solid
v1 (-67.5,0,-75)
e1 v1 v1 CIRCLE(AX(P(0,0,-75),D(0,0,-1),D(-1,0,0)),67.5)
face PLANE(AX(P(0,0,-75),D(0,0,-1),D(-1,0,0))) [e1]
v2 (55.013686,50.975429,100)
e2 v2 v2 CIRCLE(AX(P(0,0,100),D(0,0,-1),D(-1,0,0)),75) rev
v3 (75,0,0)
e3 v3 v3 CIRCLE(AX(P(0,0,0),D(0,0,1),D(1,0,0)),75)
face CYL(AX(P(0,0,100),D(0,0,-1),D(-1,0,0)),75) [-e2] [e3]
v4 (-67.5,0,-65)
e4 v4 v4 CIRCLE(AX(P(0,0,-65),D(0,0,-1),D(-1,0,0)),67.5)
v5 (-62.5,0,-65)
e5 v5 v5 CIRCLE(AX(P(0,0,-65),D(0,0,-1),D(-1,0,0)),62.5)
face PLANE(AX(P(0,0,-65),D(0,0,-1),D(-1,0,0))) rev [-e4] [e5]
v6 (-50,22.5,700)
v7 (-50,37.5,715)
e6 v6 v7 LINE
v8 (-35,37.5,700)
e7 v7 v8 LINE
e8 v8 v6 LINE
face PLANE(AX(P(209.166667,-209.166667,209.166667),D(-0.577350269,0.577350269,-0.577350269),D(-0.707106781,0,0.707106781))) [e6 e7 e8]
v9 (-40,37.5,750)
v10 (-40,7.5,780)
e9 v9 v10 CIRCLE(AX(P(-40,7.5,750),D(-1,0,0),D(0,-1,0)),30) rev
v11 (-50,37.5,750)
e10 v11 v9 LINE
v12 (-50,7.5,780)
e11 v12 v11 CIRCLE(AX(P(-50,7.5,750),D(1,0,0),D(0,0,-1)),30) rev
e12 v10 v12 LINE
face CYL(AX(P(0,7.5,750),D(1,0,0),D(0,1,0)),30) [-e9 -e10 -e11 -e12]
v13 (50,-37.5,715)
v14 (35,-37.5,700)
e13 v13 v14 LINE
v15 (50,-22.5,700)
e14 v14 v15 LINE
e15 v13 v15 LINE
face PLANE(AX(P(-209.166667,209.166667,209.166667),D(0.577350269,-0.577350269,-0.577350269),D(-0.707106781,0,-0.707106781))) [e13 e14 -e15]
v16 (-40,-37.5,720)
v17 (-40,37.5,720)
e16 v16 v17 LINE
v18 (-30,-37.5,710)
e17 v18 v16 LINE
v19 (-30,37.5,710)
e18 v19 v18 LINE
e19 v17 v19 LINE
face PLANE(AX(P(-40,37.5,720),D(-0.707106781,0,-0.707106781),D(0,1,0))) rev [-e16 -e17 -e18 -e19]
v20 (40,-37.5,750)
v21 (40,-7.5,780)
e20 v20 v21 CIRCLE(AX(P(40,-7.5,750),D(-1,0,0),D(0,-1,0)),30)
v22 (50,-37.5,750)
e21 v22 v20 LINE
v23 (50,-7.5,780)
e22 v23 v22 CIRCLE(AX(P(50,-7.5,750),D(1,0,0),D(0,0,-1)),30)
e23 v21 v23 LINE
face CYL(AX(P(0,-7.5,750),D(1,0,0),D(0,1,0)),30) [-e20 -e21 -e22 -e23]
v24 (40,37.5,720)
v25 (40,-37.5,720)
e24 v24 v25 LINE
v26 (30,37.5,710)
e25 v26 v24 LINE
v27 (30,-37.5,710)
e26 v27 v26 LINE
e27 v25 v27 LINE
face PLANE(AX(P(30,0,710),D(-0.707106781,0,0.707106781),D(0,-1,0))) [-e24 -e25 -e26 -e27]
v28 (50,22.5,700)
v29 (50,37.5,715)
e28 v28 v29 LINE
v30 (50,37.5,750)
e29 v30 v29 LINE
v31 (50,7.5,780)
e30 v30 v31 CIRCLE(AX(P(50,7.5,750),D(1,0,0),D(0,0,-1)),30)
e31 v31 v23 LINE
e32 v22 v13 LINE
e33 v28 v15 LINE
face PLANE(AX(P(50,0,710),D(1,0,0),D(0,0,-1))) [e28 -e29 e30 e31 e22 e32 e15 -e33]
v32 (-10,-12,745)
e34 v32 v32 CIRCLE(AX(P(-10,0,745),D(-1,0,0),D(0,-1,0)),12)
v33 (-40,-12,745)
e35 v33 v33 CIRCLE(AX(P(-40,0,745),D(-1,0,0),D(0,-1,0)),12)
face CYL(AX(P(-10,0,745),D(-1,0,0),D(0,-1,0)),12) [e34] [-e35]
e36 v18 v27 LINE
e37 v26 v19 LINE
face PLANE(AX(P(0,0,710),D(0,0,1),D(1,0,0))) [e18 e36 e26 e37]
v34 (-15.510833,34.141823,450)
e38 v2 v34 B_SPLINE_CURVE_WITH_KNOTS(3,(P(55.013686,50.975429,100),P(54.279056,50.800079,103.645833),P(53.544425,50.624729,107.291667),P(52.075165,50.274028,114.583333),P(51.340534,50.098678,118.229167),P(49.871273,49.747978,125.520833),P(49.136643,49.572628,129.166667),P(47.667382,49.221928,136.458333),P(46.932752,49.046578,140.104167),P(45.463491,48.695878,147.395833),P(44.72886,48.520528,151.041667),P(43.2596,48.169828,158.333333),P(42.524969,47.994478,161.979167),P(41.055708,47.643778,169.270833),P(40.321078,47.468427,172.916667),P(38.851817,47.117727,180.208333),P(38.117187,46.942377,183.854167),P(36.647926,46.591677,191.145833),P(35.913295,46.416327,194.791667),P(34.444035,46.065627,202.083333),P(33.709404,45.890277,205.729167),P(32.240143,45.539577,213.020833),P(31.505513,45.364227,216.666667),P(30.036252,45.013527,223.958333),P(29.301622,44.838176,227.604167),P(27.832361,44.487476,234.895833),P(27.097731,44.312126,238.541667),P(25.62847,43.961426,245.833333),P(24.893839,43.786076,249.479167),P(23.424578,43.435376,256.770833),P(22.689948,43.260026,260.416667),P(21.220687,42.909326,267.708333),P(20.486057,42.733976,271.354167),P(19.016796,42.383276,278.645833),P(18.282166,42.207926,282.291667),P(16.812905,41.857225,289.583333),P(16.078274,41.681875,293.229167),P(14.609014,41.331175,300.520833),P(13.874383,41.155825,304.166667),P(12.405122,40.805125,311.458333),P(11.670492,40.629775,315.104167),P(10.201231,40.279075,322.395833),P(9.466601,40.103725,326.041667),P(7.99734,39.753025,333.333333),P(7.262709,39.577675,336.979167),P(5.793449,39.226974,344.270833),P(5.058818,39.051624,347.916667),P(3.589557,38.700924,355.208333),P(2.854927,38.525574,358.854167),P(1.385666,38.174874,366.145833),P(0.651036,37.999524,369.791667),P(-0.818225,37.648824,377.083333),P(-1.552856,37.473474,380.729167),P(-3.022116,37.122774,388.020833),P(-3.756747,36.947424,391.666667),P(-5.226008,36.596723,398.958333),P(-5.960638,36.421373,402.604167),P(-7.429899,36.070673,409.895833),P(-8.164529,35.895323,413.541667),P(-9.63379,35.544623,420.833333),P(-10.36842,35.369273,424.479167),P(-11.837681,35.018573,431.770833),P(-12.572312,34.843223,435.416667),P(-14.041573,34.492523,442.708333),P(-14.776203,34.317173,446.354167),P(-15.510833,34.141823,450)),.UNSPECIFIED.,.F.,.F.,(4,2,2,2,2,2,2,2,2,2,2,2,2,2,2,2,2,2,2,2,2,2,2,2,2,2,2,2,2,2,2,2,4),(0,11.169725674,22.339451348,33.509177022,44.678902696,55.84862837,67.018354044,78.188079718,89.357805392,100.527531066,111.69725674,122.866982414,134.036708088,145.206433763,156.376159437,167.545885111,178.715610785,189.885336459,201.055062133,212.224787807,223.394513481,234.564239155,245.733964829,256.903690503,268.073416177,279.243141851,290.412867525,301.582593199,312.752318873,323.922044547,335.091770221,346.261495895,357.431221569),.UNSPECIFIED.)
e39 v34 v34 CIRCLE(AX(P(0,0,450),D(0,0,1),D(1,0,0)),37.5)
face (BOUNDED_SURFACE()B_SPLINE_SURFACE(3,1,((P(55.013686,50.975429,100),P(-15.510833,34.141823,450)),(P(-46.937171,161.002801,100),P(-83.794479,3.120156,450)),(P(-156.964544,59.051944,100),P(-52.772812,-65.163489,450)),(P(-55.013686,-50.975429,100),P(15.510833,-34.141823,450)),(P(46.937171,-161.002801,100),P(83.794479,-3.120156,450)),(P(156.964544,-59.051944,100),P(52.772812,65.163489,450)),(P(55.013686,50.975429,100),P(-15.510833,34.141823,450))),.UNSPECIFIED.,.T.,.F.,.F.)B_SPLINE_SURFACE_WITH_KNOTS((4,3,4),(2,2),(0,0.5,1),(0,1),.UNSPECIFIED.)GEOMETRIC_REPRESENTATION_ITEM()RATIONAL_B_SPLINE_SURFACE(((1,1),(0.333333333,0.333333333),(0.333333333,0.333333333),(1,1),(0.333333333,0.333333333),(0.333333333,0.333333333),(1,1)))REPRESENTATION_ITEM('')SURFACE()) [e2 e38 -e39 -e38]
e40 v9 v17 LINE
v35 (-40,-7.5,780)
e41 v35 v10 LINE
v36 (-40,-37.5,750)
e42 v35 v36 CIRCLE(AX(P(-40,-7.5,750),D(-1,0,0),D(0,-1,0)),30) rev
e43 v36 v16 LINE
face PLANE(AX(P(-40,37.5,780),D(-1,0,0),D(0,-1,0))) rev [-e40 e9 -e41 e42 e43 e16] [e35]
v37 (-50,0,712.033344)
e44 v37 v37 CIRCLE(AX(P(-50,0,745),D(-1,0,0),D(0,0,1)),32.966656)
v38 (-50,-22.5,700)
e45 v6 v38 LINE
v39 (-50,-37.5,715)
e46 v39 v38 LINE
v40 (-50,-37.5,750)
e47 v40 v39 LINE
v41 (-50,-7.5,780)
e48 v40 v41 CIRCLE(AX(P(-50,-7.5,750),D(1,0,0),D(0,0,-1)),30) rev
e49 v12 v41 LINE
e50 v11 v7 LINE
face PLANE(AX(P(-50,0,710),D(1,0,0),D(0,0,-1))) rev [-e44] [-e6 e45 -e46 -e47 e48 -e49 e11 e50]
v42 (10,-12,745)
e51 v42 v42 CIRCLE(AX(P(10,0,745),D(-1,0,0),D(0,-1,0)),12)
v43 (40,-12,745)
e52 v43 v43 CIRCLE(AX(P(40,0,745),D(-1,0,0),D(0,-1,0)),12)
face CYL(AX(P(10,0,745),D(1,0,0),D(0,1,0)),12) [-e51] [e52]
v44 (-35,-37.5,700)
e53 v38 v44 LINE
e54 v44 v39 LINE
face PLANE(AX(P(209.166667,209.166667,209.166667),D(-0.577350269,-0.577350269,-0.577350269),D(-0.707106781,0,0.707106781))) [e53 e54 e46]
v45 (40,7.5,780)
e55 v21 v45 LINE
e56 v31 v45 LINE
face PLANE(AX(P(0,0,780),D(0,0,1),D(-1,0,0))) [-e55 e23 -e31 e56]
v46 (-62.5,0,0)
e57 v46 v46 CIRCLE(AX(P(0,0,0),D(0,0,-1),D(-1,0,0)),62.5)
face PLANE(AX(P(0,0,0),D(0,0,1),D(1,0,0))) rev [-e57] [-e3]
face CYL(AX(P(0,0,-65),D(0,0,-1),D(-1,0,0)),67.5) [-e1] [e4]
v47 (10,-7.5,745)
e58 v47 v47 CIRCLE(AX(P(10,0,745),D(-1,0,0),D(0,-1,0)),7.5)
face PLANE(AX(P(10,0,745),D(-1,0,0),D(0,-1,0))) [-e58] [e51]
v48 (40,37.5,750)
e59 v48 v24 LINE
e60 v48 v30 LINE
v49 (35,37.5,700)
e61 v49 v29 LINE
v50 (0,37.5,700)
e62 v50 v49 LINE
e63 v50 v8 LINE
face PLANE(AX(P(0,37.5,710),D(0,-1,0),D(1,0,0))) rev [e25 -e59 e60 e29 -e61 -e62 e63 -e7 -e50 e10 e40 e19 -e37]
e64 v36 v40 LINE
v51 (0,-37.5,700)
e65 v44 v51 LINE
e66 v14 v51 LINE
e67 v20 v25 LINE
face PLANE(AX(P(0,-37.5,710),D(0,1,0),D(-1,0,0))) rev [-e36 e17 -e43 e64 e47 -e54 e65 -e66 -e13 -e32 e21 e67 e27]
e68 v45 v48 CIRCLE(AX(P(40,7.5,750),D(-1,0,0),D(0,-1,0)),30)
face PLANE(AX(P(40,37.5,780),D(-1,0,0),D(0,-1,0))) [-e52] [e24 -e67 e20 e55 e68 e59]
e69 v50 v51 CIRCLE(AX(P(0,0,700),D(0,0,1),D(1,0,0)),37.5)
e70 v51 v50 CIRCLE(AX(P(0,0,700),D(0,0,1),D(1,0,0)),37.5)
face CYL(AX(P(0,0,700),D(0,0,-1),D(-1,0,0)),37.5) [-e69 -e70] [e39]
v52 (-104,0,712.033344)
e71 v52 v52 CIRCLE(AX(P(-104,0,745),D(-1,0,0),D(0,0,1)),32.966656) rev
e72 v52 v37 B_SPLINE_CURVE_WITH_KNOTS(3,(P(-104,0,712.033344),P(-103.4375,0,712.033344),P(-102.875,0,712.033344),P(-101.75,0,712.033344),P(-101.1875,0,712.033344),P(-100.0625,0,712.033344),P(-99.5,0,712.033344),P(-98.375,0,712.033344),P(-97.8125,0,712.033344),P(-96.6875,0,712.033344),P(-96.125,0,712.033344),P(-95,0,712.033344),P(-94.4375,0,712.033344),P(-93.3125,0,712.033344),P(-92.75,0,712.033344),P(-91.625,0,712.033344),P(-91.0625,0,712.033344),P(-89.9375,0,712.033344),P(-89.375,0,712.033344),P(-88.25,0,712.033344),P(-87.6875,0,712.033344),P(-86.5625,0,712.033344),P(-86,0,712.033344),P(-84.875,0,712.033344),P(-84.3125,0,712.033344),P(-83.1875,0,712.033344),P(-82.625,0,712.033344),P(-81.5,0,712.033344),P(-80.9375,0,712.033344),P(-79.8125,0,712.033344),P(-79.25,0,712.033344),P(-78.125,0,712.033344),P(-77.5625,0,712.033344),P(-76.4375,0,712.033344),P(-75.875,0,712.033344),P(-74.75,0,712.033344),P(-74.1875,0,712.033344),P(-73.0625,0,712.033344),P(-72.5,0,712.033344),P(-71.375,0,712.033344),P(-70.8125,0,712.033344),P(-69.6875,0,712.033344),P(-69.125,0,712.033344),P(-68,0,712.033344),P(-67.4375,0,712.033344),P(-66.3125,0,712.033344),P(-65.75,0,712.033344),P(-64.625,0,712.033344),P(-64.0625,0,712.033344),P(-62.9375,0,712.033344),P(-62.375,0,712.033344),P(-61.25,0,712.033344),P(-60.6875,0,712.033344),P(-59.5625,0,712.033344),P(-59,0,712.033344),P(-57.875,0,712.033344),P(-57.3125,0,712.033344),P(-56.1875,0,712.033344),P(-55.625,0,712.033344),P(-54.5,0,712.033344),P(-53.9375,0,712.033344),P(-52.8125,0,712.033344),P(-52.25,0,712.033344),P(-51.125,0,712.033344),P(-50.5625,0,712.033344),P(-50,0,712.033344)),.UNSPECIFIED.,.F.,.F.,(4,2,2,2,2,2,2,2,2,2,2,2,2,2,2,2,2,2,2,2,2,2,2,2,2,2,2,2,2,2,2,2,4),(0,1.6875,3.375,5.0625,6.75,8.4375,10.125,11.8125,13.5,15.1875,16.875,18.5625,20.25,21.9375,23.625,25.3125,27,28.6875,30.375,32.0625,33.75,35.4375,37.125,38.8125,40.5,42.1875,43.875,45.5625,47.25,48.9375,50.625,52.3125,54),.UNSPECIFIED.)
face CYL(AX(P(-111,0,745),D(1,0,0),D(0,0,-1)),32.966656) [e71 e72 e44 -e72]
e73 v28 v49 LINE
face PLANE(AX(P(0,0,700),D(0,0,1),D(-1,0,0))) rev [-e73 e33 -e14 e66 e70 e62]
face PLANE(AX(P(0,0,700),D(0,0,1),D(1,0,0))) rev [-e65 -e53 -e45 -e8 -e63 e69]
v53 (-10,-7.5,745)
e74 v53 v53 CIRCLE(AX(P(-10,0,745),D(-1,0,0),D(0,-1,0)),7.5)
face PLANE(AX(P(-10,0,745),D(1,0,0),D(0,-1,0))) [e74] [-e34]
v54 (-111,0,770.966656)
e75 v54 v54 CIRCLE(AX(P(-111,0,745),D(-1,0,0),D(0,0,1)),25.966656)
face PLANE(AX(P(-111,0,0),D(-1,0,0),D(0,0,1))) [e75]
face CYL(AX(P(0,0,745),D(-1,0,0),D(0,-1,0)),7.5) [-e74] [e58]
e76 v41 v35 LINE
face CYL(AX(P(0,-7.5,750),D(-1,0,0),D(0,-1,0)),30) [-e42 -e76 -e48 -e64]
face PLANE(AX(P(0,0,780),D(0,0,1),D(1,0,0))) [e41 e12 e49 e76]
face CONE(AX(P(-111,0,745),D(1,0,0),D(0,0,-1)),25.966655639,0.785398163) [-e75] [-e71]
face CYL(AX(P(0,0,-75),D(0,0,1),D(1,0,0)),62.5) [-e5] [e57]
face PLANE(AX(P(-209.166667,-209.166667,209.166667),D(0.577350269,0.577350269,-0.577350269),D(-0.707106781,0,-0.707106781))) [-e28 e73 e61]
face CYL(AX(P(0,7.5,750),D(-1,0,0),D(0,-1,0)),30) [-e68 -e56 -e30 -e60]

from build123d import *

# Parameters (mm, degrees)
SKETCH1_R           = 75
BOSS_EXTRUDE1_DEPTH = 100
SKETCH3_R           = 37.5
BOSS_EXTRUDE2_DEPTH = 250
SKETCH4_R           = 62.5
BOSS_EXTRUDE3_DEPTH = 75
SKETCH5_W           = 50
SKETCH5_H           = 75
BOSS_EXTRUDE4_DEPTH = 10
SKETCH6_W           = 10
SKETCH6_H           = 75
BOSS_EXTRUDE5_DEPTH = 70
SKETCH7_R           = 7.5
BOSS_EXTRUDE6_DEPTH = 40
BOSS_EXTRUDE7_START = 61
SKETCH8_R           = 32.966655639
SKETCH8_R_2         = 7.5
BOSS_EXTRUDE7_DEPTH = 61
CHAMFER2_SIZE       = 7
BOSS_EXTRUDE8_START = 30
SKETCH9_R           = 12
SKETCH9_R_2         = 7.5
BOSS_EXTRUDE8_DEPTH = 30
FILLET1_R           = 30
CHAMFER4_SIZE       = 10
CHAMFER5_START      = 353
CHAMFER5_OUTLINE_W  = 21
CHAMFER5_OUTLINE_H  = 25
CHAMFER5_DEPTH      = 9.287293916
CHAMFER6_START      = 353
CHAMFER6_OUTLINE_W  = 21
CHAMFER6_OUTLINE_H  = 25
CHAMFER6_DEPTH      = 9.287293916
CHAMFER7_START      = -362.287293916
CHAMFER7_OUTLINE_W  = 21
CHAMFER7_OUTLINE_H  = 25
CHAMFER7_DEPTH      = 9.287293916
CHAMFER8_START      = -362.287293916
CHAMFER8_OUTLINE_W  = 21
CHAMFER8_OUTLINE_H  = 25
CHAMFER8_DEPTH      = 9.287293916
SKETCH10_R          = 67.5
BOSS_EXTRUDE9_DEPTH = 10


with BuildPart() as part:
    # Sketch1 → Boss-Extrude1 (new body)
    with BuildSketch(Plane.XY):
        Circle(SKETCH1_R)
    extrude(amount=BOSS_EXTRUDE1_DEPTH)

    # Loft1: read off the stored shape, not the designer's step
    # Loft1: loft between two sections, ruled curve by curve
    loft1_from = [
        Edge.make_bspline([(55.013686164, 50.975428734, 100), (-46.937171304, 161.002801063, 100), (-156.964543632, 59.051943595, 100), (-55.013686164, -50.975428734, 100), (46.937171304, -161.002801063, 100), (156.964543632, -59.051943595, 100), (55.013686164, 50.975428734, 100)], [0, 0, 0, 0, 0.5, 0.5, 0.5, 1, 1, 1, 1], 3, [1, 0.333333333, 0.333333333, 1, 0.333333333, 0.333333333, 1]),
    ]
    loft1_to = [
        Edge.make_bspline([(-15.510833372, 34.141822566, 450), (-83.794478503, 3.120155821, 450), (-52.772811759, -65.16348931, 450), (15.510833372, -34.141822566, 450), (83.794478503, -3.120155821, 450), (52.772811759, 65.16348931, 450), (-15.510833372, 34.141822566, 450)], [0, 0, 0, 0, 0.5, 0.5, 0.5, 1, 1, 1, 1], 3, [1, 0.333333333, 0.333333333, 1, 0.333333333, 0.333333333, 1]),
    ]
    loft1 = Solid(Shell([*[Face.make_surface_from_curves(loft1_from[k], loft1_to[k]) for k in range(1)], Face(Wire(loft1_from)), Face(Wire(loft1_to))]))
    add(loft1)

    # Sketch3 → Boss-Extrude2 (add)
    with BuildSketch(Plane.XY.offset(450)):
        with Locations(Location((0, 0, 0), (0, 0, 114.432581244))):
            Circle(SKETCH3_R)
    extrude(amount=BOSS_EXTRUDE2_DEPTH)

    # Sketch4 → Boss-Extrude3 (add)
    with BuildSketch(Plane(origin=(0, 0, 0), x_dir=(-1, 0, 0), z_dir=(0, 0, -1))):
        Circle(SKETCH4_R)
    extrude(amount=BOSS_EXTRUDE3_DEPTH)

    # Sketch5 → Boss-Extrude4 (add)
    with BuildSketch(Plane.XY.offset(700)):
        with Locations((-25, 0)):
            Rectangle(SKETCH5_W, SKETCH5_H)
    boss_extrude4 = extrude(amount=BOSS_EXTRUDE4_DEPTH)

    # Sketch6 → Boss-Extrude5 (add)
    with BuildSketch(Plane.XY.offset(710)):
        with Locations((-45, 0)):
            Rectangle(SKETCH6_W, SKETCH6_H)
    boss_extrude5 = extrude(amount=BOSS_EXTRUDE5_DEPTH)

    # Sketch7 → Boss-Extrude6 (add)
    with BuildSketch(Plane(origin=(-40, 0, 0), x_dir=(0, 0, -1), z_dir=(1, 0, 0))):
        with Locations(Location((-745, 0, 0), (0, 0, 270))):
            Circle(SKETCH7_R)
    boss_extrude6 = extrude(amount=BOSS_EXTRUDE6_DEPTH)

    # Mirror1: Boss-Extrude4, Boss-Extrude5, Boss-Extrude6 across plane
    add(boss_extrude4.mirror(Plane(origin=(0, 0, 710), x_dir=(0, 0, 1), z_dir=(-1, 0, 0))))
    add(boss_extrude5.mirror(Plane(origin=(0, 0, 710), x_dir=(0, 0, 1), z_dir=(-1, 0, 0))))
    add(boss_extrude6.mirror(Plane(origin=(0, 0, 710), x_dir=(0, 0, 1), z_dir=(-1, 0, 0))))

    # Sketch8 → Boss-Extrude7 (add)
    # profile 1 of 2: a face of its own
    with BuildSketch(Plane.ZY.offset(50).offset(BOSS_EXTRUDE7_START)):
        with Locations(Location((745, 0, 0), (0, 0, 180))):
            Circle(SKETCH8_R)
        with Locations(Location((745, 0, 0), (0, 0, 270))):
            Circle(SKETCH8_R_2, mode=Mode.SUBTRACT)
    # profile 2 of 2: a face of its own
    with BuildSketch(Plane.ZY.offset(50).offset(BOSS_EXTRUDE7_START)):
        with Locations(Location((745, 0, 0), (0, 0, 270))):
            Circle(SKETCH8_R_2)
    extrude(amount=-BOSS_EXTRUDE7_DEPTH)

    # Chamfer2
    chamfer2_edges = [part.edges().sort_by_distance(p)[0] for p in [
        (-111, 0, 777.966655639),
    ]]
    chamfer(chamfer2_edges, length=CHAMFER2_SIZE)

    # Sketch9 → Boss-Extrude8 (add)
    with BuildSketch(Plane.ZY.offset(-40).offset(BOSS_EXTRUDE8_START)):
        with Locations(Location((745, 0, 0), (0, 0, 270))):
            Circle(SKETCH9_R)
        with Locations(Location((745, 0, 0), (0, 0, 270))):
            Circle(SKETCH9_R_2, mode=Mode.SUBTRACT)
    boss_extrude8 = extrude(amount=-BOSS_EXTRUDE8_DEPTH)

    # Mirror2: Boss-Extrude8 across plane
    add(boss_extrude8.mirror(Plane(origin=(0, 0, 0), x_dir=(0, 0, 1), z_dir=(1, 0, 0))))

    # Fillet1
    fillet1_edges = [part.edges().sort_by_distance(p)[0] for p in [
        (-45, -37.5, 780),
        (-45, 37.5, 780),
        (45, 37.5, 780),
        (45, -37.5, 780),
    ]]
    fillet(fillet1_edges, radius=FILLET1_R)

    # Chamfer4
    chamfer4_edges = [part.edges().sort_by_distance(p)[0] for p in [
        (-40, 0, 710),
        (40, 0, 710),
    ]]
    chamfer(chamfer4_edges, length=CHAMFER4_SIZE)

    # Chamfer5: read off the stored shape, not the designer's step
    # Chamfer5 outline → Chamfer5 (cut)
    with BuildSketch(Plane(origin=(0, 0, 0), x_dir=(0.8164965809277258, 0.40824829046386313, -0.40824829046386313), z_dir=(0.5773502691896258, -0.5773502691896258, 0.5773502691896258)).offset(CHAMFER5_START)):
        with Locations((-308.5, 521.5)):
            Rectangle(CHAMFER5_OUTLINE_W, CHAMFER5_OUTLINE_H)
    extrude(amount=CHAMFER5_DEPTH, mode=Mode.SUBTRACT)

    # Chamfer6: read off the stored shape, not the designer's step
    # Chamfer6 outline → Chamfer6 (cut)
    with BuildSketch(Plane(origin=(0, 0, 0), x_dir=(0.8164965809277258, -0.40824829046386313, -0.40824829046386313), z_dir=(0.5773502691896258, 0.5773502691896258, 0.5773502691896258)).offset(CHAMFER6_START)):
        with Locations((-308.5, -521.5)):
            Rectangle(CHAMFER6_OUTLINE_W, CHAMFER6_OUTLINE_H)
    extrude(amount=CHAMFER6_DEPTH, mode=Mode.SUBTRACT)

    # Chamfer7: read off the stored shape, not the designer's step
    # Chamfer7 outline → Chamfer7 (cut)
    with BuildSketch(Plane(origin=(0, 0, 0), x_dir=(0.8164965809277258, -0.40824829046386313, 0.40824829046386313), z_dir=(0.5773502691896258, 0.5773502691896258, -0.5773502691896258)).offset(CHAMFER7_START)):
        with Locations((308.5, -521.5)):
            Rectangle(CHAMFER7_OUTLINE_W, CHAMFER7_OUTLINE_H)
    extrude(amount=CHAMFER7_DEPTH, mode=Mode.SUBTRACT)

    # Chamfer8: read off the stored shape, not the designer's step
    # Chamfer8 outline → Chamfer8 (cut)
    with BuildSketch(Plane(origin=(0, 0, 0), x_dir=(0.8164965809277258, 0.40824829046386313, 0.40824829046386313), z_dir=(0.5773502691896258, -0.5773502691896258, -0.5773502691896258)).offset(CHAMFER8_START)):
        with Locations((308.5, 521.5)):
            Rectangle(CHAMFER8_OUTLINE_W, CHAMFER8_OUTLINE_H)
    extrude(amount=CHAMFER8_DEPTH, mode=Mode.SUBTRACT)

    # Sketch10 → Boss-Extrude9 (add)
    with BuildSketch(Plane(origin=(0, 0, -75), x_dir=(-1, 0, 0), z_dir=(0, 0, -1))):
        Circle(SKETCH10_R)
    extrude(amount=-BOSS_EXTRUDE9_DEPTH)


solid = part.part
